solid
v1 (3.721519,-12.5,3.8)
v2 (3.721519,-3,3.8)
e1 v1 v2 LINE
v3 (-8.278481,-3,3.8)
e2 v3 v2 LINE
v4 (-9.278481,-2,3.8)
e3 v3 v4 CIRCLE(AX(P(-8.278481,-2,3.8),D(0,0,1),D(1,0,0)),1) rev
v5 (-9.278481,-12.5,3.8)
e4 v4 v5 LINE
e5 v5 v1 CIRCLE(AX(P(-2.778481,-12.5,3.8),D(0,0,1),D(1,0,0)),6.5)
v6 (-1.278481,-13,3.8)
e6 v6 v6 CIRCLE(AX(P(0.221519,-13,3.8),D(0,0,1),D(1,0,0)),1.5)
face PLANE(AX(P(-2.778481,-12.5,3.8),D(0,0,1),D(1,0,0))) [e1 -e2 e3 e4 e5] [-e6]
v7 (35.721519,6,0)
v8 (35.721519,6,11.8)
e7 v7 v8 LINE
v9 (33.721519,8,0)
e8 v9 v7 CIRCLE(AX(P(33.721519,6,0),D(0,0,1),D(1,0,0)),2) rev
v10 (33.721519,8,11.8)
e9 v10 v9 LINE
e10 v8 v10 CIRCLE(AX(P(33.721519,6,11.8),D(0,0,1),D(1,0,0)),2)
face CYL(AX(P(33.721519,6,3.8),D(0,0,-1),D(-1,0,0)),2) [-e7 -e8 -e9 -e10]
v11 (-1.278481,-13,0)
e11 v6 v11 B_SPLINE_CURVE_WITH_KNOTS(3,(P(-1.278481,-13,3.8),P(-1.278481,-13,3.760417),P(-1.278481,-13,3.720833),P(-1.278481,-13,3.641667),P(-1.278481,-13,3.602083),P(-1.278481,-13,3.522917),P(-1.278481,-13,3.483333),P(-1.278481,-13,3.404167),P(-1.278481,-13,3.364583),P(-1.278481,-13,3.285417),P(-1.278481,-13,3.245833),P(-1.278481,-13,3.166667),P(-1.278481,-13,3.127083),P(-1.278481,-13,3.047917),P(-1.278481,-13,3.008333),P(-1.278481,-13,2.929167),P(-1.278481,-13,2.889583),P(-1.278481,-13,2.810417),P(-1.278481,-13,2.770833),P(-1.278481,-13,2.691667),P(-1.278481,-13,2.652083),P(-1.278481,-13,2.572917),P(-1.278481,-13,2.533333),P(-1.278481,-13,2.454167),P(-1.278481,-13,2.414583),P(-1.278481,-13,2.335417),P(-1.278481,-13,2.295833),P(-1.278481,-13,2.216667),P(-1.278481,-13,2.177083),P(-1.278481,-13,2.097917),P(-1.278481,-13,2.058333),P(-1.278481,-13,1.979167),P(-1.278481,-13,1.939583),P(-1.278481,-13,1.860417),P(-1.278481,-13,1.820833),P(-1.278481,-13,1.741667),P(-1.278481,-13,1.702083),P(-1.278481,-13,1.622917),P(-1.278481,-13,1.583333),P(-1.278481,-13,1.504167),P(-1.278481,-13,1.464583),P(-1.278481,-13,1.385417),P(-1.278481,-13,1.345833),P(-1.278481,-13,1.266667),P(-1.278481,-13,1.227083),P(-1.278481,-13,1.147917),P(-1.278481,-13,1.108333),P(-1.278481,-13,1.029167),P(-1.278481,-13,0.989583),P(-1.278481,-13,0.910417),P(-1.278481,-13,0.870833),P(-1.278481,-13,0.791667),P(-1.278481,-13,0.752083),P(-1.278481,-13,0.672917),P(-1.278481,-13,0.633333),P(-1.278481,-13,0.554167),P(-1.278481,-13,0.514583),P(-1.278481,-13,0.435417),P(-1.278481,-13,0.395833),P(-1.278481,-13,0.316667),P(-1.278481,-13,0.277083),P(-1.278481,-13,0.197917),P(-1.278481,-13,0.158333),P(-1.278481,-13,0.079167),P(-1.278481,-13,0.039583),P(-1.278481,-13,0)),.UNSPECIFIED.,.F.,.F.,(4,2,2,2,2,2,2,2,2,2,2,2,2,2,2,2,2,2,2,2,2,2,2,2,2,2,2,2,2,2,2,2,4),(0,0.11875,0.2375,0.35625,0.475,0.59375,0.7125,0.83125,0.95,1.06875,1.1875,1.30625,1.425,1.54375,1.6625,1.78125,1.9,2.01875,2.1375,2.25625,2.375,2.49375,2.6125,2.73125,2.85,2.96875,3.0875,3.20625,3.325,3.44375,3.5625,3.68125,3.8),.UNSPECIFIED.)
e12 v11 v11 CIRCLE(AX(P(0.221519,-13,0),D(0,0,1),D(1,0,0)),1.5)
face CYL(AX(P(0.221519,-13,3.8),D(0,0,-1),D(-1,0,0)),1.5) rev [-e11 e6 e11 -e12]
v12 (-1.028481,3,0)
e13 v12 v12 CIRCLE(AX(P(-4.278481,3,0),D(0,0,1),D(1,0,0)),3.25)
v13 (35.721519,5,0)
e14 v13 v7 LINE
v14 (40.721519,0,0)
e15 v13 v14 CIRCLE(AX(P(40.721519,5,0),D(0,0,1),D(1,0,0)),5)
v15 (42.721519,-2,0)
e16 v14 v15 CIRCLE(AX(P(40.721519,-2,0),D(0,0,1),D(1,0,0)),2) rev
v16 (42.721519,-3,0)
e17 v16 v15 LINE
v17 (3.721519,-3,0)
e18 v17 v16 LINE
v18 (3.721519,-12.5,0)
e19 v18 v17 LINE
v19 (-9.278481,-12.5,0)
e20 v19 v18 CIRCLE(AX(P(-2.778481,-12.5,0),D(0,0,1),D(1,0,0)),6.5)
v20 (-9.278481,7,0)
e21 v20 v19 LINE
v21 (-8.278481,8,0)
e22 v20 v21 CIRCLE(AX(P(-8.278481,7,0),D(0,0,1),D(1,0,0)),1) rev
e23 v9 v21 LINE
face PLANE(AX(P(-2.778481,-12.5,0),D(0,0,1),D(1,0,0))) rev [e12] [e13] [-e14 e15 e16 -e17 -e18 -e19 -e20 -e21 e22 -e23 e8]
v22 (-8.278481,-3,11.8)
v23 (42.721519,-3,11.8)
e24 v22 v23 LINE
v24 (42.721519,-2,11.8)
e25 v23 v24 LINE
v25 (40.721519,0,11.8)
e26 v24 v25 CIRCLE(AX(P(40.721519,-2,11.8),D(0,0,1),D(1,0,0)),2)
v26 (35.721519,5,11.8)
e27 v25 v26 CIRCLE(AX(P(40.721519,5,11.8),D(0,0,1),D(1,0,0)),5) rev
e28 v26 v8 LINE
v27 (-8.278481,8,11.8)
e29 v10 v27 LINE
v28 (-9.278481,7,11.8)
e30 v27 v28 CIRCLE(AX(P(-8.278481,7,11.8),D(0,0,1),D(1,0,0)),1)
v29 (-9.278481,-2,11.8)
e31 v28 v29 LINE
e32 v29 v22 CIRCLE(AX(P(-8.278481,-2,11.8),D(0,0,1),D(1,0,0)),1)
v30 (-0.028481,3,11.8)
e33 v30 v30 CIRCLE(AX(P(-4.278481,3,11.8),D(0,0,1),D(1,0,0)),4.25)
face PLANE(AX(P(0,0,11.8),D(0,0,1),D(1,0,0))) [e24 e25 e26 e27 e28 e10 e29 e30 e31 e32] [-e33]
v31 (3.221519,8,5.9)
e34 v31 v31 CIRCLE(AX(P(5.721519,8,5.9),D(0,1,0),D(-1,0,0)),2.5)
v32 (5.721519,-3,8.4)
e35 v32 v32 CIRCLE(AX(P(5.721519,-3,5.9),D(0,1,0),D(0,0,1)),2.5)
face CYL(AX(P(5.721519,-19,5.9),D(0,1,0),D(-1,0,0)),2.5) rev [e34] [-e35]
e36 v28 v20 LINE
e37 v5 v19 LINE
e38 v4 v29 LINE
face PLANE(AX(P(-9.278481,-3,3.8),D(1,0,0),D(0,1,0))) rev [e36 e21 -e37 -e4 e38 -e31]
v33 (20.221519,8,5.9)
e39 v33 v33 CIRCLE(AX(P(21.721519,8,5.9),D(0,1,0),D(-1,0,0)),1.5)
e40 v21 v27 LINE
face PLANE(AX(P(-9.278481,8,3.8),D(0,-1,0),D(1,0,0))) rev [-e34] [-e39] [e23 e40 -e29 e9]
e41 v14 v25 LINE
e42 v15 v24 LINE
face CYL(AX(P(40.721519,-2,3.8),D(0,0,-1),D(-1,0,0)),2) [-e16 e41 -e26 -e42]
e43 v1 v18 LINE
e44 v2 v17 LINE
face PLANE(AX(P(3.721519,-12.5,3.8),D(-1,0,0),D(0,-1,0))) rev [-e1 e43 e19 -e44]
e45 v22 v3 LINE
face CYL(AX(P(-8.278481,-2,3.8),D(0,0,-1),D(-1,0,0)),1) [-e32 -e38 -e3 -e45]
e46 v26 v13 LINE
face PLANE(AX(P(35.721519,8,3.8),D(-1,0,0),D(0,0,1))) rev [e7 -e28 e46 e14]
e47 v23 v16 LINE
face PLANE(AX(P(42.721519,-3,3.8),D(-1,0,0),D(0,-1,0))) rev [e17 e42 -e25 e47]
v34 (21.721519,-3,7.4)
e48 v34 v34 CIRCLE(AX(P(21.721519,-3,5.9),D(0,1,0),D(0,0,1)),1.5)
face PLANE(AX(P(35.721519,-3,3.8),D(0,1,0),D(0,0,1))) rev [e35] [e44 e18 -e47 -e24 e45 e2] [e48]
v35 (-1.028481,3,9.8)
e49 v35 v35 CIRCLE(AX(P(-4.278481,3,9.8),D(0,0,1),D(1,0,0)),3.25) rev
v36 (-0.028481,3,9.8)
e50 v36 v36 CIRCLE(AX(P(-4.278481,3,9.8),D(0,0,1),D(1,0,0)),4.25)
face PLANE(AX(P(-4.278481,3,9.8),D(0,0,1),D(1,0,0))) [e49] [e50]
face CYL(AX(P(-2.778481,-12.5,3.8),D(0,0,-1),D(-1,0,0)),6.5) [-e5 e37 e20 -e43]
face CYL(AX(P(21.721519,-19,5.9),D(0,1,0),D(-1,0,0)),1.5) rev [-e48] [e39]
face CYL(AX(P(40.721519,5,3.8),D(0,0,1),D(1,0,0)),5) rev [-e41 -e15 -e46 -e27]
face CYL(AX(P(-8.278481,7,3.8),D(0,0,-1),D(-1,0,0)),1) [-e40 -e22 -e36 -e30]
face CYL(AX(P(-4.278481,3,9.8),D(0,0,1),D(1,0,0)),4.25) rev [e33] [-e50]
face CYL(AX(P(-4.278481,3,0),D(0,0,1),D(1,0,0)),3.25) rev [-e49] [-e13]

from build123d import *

# Parameters (mm, degrees)
SKETCH_1_R          = 1.5
EXTRUDE_1_DEPTH     = 3.8
EXTRUDE_2_DEPTH     = 8
SKETCH_3_R          = 3.25
CUT_EXTRUDE_1_DEPTH = 49.22207155
SKETCH_4_R          = 4.25
CUT_EXTRUDE_2_DEPTH = 2
FILLET_2_R          = 1
FILLET_3_R          = 2
FILLET_4_R          = 5
FILLET_5_R          = 2
SKETCH_5_R          = 2.5
SKETCH_5_R_2        = 1.5
CUT_EXTRUDE_3_DEPTH = 52.897670319


with BuildPart() as part:
    # 草图1 → 凸台-拉伸1 (new body)
    with BuildSketch(Plane.XY):
        with BuildLine():
            Line((35.721518987, -3), (42.721518987, -3))
            Line((42.721518987, -3), (42.721518987, 0))
            Line((42.721518987, 0), (35.721518987, 0))
            Line((35.721518987, 0), (35.721518987, 8))
            Line((35.721518987, 8), (-9.278481013, 8))
            Line((-9.278481013, 8), (-9.278481013, -3))
            Line((-9.278481013, -3), (-9.278481013, -12.5))
            ThreePointArc((-9.278481013, -12.5), (-2.778481013, -19), (3.721518987, -12.5))
            Line((3.721518987, -12.5), (3.721518987, -3))
            Line((3.721518987, -3), (35.721518987, -3))
        make_face()
        with Locations(Location((0.221518987, -13, 0), (0, 0, 180))):
            Circle(SKETCH_1_R, mode=Mode.SUBTRACT)
    extrude(amount=EXTRUDE_1_DEPTH)

    # 草图2 → 凸台-拉伸2 (add)
    with BuildSketch(Plane.XY.offset(3.8)):
        Polygon((3.721518987, -3), (-9.278481013, -3), (-9.278481013, 8), (35.721518987, 8), (35.721518987, 0), (42.721518987, 0), (42.721518987, -3), align=None)
    extrude(amount=EXTRUDE_2_DEPTH)

    # 草图3 → 切除-拉伸1 (cut, through all)
    with BuildSketch(Plane.XY.offset(11.8)):
        with Locations((-4.278481013, 3)):
            Circle(SKETCH_3_R)
    extrude(amount=-CUT_EXTRUDE_1_DEPTH, mode=Mode.SUBTRACT)

    # 草图4 → 切除-拉伸2 (cut)
    with BuildSketch(Plane.XY.offset(11.8)):
        with Locations((-4.278481013, 3)):
            Circle(SKETCH_4_R)
    extrude(amount=-CUT_EXTRUDE_2_DEPTH, mode=Mode.SUBTRACT)

    # 圆角2
    fillet_2_edges = [part.edges().sort_by_distance(p)[0] for p in [
        (-9.278481013, 8, 5.9),
        (-9.278481013, -3, 7.8),
    ]]
    fillet(fillet_2_edges, radius=FILLET_2_R)

    # 圆角3
    fillet_3_edges = [part.edges().sort_by_distance(p)[0] for p in [
        (35.721518987, 8, 5.9),
    ]]
    fillet(fillet_3_edges, radius=FILLET_3_R)

    # 圆角4
    fillet_4_edges = [part.edges().sort_by_distance(p)[0] for p in [
        (35.721518987, 0, 5.9),
    ]]
    fillet(fillet_4_edges, radius=FILLET_4_R)

    # 圆角5
    fillet_5_edges = [part.edges().sort_by_distance(p)[0] for p in [
        (42.721518987, 0, 5.9),
    ]]
    fillet(fillet_5_edges, radius=FILLET_5_R - 0.0001)  # a hair under: the kernel refuses the full size

    # 草图5 → 切除-拉伸3 (cut, through all)
    with BuildSketch(Plane(origin=(0, 8, 0), x_dir=(1, 0, 0), z_dir=(0, 1, 0))):
        with Locations(Location((5.721518987, -5.9, 0), (0, 0, 180))):
            Circle(SKETCH_5_R)
        with Locations(Location((21.721518987, -5.9, 0), (0, 0, 180))):
            Circle(SKETCH_5_R_2)
    extrude(amount=-CUT_EXTRUDE_3_DEPTH, mode=Mode.SUBTRACT)


solid = part.part
